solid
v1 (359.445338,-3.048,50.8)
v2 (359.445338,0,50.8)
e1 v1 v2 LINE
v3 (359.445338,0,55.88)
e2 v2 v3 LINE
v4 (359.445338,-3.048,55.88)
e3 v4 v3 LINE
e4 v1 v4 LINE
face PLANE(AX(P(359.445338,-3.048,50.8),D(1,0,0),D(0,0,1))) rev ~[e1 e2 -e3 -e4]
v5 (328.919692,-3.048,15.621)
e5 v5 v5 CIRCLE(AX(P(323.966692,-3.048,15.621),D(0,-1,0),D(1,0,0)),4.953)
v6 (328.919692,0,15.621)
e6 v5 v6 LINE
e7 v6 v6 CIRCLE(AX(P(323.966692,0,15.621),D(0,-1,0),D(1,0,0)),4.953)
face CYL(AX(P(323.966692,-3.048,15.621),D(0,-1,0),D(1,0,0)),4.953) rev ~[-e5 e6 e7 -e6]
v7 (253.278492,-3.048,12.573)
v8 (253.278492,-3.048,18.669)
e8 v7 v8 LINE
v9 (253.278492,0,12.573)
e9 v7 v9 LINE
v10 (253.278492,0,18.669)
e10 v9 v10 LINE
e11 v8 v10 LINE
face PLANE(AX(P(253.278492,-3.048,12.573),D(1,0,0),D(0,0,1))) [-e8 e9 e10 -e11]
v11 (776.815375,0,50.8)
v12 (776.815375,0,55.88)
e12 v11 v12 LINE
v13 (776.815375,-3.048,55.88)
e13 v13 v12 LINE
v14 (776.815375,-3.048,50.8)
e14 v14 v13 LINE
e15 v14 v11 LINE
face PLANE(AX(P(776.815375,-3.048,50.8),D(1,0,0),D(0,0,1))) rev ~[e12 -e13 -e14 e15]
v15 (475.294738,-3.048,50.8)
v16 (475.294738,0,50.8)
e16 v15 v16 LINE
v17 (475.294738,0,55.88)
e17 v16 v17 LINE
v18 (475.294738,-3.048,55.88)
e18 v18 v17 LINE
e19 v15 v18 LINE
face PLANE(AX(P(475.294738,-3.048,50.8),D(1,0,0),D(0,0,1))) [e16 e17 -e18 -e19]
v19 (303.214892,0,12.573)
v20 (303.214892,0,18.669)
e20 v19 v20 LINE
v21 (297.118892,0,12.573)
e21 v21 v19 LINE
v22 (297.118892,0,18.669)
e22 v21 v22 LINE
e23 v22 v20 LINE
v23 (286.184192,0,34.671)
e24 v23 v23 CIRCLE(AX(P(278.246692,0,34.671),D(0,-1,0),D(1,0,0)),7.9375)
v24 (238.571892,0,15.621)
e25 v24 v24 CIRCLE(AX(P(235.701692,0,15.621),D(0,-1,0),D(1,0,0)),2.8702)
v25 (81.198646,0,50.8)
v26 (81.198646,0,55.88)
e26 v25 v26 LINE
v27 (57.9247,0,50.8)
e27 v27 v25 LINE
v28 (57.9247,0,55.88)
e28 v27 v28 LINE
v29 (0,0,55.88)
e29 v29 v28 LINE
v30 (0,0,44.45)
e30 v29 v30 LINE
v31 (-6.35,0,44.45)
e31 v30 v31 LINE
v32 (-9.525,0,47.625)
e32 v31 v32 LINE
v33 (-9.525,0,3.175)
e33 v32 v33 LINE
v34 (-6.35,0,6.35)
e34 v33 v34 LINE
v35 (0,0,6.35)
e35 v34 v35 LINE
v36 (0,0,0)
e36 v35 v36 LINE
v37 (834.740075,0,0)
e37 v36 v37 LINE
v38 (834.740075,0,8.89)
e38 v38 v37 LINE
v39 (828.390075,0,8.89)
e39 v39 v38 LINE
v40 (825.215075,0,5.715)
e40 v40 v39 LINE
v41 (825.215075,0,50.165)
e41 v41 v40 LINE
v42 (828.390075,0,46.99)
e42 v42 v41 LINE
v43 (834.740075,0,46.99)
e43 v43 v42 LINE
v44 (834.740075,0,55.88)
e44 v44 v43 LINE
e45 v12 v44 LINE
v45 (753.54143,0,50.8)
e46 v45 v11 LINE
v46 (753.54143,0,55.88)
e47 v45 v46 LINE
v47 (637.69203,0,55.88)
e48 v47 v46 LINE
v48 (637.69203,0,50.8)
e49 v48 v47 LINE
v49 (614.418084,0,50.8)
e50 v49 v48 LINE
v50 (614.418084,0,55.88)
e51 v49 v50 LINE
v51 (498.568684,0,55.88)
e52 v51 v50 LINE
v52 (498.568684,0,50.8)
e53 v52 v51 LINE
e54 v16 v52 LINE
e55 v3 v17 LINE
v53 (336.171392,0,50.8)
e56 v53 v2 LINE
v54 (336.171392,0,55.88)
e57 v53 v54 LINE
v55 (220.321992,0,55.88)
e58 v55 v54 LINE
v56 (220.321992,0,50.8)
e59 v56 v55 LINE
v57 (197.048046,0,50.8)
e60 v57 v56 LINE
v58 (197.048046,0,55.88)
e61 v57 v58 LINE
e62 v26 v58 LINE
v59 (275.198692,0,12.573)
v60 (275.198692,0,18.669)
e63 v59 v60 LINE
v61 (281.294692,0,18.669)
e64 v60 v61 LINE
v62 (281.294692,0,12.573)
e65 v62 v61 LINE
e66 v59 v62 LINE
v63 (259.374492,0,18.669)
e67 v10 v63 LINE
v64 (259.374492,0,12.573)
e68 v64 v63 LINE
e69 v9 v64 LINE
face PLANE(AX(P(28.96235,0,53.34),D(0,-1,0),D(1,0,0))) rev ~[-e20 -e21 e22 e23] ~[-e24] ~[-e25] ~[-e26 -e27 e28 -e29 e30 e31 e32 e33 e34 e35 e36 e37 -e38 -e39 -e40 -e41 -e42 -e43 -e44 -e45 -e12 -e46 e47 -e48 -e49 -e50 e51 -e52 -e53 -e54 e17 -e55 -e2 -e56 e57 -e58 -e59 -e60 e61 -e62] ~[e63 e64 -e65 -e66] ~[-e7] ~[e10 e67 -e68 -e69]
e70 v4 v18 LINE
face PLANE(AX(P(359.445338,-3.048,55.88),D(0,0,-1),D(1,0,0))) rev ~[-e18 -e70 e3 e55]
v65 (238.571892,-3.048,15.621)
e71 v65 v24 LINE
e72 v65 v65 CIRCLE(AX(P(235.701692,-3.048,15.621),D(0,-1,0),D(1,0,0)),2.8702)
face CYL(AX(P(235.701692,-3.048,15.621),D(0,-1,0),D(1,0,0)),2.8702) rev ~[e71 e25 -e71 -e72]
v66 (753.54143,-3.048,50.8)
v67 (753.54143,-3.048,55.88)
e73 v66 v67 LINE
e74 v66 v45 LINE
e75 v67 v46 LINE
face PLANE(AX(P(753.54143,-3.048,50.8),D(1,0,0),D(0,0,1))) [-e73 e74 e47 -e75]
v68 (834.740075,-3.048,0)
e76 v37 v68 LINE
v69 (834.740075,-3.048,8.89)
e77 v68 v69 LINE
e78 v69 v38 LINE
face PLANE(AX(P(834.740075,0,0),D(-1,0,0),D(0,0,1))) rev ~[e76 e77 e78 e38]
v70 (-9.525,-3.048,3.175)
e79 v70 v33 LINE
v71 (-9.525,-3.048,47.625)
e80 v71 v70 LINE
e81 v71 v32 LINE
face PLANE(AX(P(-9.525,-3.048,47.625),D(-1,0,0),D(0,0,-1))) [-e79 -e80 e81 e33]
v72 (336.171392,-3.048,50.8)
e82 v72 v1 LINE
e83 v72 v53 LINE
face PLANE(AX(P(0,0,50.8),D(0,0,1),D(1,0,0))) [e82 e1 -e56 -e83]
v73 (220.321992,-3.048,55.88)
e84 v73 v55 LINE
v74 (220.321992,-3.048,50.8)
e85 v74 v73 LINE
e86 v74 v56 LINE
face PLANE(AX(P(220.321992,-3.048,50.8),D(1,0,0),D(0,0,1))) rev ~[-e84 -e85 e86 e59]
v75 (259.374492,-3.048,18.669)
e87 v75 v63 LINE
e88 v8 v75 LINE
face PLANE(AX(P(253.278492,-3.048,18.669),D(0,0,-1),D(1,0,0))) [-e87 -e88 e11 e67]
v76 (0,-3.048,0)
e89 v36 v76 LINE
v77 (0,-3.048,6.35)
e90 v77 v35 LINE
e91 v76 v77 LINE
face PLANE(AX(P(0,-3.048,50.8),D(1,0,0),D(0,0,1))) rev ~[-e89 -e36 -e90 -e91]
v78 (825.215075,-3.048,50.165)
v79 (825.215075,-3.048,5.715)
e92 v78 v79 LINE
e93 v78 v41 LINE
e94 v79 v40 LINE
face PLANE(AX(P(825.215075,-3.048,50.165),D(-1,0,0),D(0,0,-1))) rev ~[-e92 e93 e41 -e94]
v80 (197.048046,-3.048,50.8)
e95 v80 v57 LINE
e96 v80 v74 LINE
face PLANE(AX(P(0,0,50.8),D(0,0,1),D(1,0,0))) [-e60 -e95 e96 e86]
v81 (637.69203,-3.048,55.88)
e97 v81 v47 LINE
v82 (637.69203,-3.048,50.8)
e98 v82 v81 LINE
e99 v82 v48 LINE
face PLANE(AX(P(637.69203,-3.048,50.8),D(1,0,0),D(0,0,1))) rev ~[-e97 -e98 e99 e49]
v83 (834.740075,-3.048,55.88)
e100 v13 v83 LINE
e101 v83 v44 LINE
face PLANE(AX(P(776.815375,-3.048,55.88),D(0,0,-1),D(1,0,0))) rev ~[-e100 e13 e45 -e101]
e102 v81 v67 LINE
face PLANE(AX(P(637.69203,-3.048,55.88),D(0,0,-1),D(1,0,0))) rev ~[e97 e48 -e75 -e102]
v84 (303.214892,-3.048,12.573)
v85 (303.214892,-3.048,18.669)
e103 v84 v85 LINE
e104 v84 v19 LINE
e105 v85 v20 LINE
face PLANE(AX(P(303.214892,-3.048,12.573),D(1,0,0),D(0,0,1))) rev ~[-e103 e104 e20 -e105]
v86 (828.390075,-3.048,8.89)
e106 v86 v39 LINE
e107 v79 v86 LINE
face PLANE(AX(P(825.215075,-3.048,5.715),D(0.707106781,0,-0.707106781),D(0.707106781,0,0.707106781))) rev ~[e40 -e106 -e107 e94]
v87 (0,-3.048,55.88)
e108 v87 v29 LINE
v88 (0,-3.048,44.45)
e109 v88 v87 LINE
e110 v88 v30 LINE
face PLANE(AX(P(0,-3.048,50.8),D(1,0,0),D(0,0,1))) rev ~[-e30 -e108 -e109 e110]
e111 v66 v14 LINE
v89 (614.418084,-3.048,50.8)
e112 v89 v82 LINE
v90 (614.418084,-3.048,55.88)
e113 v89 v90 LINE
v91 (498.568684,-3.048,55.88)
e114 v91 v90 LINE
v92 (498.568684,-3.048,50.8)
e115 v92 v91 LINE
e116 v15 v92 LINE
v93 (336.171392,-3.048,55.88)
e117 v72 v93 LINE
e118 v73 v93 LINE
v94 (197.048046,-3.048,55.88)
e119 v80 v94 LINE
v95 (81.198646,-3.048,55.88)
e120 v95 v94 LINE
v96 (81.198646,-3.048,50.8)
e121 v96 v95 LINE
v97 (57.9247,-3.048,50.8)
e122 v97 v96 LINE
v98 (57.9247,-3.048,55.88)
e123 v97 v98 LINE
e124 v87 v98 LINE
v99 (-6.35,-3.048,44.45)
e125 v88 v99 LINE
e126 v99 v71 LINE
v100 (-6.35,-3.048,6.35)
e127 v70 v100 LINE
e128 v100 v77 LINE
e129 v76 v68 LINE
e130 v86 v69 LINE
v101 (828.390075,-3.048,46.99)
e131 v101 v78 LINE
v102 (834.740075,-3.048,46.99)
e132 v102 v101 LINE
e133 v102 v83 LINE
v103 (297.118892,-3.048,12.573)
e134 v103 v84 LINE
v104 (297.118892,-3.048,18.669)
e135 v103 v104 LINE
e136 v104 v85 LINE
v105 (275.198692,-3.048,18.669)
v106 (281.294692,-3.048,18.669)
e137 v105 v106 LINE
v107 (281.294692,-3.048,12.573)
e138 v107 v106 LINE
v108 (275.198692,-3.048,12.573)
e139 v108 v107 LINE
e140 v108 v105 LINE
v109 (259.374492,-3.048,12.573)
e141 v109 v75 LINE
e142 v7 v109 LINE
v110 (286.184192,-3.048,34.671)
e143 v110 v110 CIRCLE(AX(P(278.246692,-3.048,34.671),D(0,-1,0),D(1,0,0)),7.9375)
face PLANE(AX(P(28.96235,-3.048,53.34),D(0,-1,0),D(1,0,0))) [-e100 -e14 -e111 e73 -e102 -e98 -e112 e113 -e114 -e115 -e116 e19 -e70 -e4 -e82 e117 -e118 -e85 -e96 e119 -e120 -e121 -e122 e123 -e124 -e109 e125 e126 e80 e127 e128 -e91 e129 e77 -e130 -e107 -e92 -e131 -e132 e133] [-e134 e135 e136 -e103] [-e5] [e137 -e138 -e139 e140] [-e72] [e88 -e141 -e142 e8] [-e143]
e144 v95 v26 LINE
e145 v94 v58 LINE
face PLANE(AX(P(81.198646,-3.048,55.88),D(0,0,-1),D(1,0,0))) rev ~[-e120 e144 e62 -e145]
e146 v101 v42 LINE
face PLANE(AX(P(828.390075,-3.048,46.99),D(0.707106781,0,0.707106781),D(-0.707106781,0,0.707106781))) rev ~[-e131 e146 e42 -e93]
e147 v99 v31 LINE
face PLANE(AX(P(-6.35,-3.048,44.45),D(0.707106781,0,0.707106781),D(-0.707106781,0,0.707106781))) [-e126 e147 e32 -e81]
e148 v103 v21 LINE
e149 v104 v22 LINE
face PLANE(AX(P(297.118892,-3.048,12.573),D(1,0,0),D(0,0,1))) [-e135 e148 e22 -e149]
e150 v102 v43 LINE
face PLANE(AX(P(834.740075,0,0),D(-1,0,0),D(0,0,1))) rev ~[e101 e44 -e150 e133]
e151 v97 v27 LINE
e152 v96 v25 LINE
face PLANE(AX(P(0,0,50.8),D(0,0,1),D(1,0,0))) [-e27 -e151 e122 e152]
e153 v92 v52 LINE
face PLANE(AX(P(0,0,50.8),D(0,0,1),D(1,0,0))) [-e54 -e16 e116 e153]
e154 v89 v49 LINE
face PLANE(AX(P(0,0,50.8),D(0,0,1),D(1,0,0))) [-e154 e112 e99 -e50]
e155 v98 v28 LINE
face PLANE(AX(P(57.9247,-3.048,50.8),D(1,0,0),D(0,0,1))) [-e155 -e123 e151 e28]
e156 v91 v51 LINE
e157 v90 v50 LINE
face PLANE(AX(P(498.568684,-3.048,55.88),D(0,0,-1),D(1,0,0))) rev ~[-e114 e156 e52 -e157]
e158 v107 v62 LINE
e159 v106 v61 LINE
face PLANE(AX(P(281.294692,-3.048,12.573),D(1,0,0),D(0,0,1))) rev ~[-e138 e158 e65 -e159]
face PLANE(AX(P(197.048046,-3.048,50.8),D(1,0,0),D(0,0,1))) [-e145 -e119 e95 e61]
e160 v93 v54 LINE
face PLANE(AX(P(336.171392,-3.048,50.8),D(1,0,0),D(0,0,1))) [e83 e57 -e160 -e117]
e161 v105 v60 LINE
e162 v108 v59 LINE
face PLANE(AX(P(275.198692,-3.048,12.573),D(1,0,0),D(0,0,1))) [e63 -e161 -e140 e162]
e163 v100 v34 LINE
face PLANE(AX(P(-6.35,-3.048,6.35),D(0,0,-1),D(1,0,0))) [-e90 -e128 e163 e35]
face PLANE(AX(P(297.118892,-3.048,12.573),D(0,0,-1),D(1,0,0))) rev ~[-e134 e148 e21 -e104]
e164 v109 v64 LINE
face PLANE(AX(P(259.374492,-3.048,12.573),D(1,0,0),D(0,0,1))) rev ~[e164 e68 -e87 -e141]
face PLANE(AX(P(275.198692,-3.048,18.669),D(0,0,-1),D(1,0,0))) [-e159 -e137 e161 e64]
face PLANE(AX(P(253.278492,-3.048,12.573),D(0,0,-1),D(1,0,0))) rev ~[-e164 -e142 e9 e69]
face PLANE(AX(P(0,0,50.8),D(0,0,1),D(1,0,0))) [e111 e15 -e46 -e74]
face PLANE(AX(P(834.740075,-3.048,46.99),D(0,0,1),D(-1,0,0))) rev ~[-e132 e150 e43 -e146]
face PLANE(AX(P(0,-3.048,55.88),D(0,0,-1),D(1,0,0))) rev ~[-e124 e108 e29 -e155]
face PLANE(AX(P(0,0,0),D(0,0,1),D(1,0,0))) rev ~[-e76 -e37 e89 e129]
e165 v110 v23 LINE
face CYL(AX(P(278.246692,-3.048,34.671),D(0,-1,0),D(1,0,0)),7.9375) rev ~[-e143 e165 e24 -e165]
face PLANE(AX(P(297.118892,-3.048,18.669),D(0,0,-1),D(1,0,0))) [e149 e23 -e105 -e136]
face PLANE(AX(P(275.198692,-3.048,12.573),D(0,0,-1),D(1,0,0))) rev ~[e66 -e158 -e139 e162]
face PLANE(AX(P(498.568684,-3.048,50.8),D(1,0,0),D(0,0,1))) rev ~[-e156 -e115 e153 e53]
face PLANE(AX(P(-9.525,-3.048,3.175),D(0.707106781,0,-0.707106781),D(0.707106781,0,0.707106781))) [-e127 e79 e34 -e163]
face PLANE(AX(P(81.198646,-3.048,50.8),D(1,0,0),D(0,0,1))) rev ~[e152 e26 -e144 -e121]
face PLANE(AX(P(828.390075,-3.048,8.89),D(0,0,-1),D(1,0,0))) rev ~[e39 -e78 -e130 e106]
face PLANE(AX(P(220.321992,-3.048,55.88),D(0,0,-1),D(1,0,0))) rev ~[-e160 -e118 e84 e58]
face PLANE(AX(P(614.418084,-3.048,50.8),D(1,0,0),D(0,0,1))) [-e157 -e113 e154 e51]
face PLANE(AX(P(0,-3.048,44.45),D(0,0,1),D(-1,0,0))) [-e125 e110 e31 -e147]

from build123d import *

# Parameters (mm, degrees)
F0_W     = 834.7400754492
F0_H     = 50.8
F1_DEPTH = 3.048
F3_W     = 57.9247
F3_H     = 5.08
F3_W_2   = 115.8494
F4_DEPTH = 3.048
F6_DEPTH = 3.048
F7_DEPTH = 3.049
F8_W     = 6.096
F8_H     = 6.096
F8_R     = 2.8702
F8_R_2   = 4.953
F8_R_3   = 7.9375
F9_DEPTH = 3.049


# Not quite as in the source:
# - a feature names something its author has since deleted; it is built from what else it names


with BuildPart() as f1:
    # F0 (on Front) → F1 (new body)
    with BuildSketch(Plane.XZ):
        with Locations((417.3700377246, 25.4)):
            Rectangle(F0_W, F0_H)
    extrude(amount=F1_DEPTH)

    # F3 (on face) → F4 (join)
    with BuildSketch(Plane.XZ.offset(3.048)):
        with Locations((28.96235, 53.34)):
            Rectangle(F3_W, F3_H)
        with Locations((139.1233459082, 53.34)):
            Rectangle(F3_W_2, F3_H)
        with Locations((278.2466918164, 53.34)):
            Rectangle(F3_W_2, F3_H)
        with Locations((417.3700377246, 53.34)):
            Rectangle(F3_W_2, F3_H)
        with Locations((556.4933836328, 53.34)):
            Rectangle(F3_W_2, F3_H)
        with Locations((695.616729541, 53.34)):
            Rectangle(F3_W_2, F3_H)
        with Locations((805.7777254492, 53.34)):
            Rectangle(F3_W, F3_H)
    extrude(amount=-F4_DEPTH)

    # F5 (on face) → F6 (join)
    with BuildSketch(Plane.XZ.offset(3.048)):
        Polygon((-6.35, 6.35), (0, 6.35), (0, 44.45), (-6.35, 44.45), (-9.525, 47.625), (-9.525, 3.175), align=None)
    extrude(amount=-F6_DEPTH)

    # F5 (on face) → F7 (cut, through all)
    with BuildSketch(Plane.XZ.offset(3.048)):
        Polygon((828.3900754492, 8.89), (834.7400754492, 8.89), (834.7400754492, 46.99), (828.3900754492, 46.99), (825.2150754492, 50.165), (825.2150754492, 5.715), align=None)
    extrude(amount=-F7_DEPTH, mode=Mode.SUBTRACT)

    # F8 (on face) → F9 (cut, through all)
    with BuildSketch(Plane.XZ.offset(3.048)):
        with Locations((256.3264918164, 15.621)):
            Rectangle(F8_W, F8_H)
        with Locations((278.2466918164, 15.621)):
            Rectangle(F8_W, F8_H)
        with Locations((300.1668918164, 15.621)):
            Rectangle(F8_W, F8_H)
        with Locations((235.7016918164, 15.621)):
            Circle(F8_R)
        with Locations((323.9666918164, 15.621)):
            Circle(F8_R_2)
        with Locations((278.2466918164, 34.671)):
            Circle(F8_R_3)
    extrude(amount=-F9_DEPTH, mode=Mode.SUBTRACT)


solid = f1.part
